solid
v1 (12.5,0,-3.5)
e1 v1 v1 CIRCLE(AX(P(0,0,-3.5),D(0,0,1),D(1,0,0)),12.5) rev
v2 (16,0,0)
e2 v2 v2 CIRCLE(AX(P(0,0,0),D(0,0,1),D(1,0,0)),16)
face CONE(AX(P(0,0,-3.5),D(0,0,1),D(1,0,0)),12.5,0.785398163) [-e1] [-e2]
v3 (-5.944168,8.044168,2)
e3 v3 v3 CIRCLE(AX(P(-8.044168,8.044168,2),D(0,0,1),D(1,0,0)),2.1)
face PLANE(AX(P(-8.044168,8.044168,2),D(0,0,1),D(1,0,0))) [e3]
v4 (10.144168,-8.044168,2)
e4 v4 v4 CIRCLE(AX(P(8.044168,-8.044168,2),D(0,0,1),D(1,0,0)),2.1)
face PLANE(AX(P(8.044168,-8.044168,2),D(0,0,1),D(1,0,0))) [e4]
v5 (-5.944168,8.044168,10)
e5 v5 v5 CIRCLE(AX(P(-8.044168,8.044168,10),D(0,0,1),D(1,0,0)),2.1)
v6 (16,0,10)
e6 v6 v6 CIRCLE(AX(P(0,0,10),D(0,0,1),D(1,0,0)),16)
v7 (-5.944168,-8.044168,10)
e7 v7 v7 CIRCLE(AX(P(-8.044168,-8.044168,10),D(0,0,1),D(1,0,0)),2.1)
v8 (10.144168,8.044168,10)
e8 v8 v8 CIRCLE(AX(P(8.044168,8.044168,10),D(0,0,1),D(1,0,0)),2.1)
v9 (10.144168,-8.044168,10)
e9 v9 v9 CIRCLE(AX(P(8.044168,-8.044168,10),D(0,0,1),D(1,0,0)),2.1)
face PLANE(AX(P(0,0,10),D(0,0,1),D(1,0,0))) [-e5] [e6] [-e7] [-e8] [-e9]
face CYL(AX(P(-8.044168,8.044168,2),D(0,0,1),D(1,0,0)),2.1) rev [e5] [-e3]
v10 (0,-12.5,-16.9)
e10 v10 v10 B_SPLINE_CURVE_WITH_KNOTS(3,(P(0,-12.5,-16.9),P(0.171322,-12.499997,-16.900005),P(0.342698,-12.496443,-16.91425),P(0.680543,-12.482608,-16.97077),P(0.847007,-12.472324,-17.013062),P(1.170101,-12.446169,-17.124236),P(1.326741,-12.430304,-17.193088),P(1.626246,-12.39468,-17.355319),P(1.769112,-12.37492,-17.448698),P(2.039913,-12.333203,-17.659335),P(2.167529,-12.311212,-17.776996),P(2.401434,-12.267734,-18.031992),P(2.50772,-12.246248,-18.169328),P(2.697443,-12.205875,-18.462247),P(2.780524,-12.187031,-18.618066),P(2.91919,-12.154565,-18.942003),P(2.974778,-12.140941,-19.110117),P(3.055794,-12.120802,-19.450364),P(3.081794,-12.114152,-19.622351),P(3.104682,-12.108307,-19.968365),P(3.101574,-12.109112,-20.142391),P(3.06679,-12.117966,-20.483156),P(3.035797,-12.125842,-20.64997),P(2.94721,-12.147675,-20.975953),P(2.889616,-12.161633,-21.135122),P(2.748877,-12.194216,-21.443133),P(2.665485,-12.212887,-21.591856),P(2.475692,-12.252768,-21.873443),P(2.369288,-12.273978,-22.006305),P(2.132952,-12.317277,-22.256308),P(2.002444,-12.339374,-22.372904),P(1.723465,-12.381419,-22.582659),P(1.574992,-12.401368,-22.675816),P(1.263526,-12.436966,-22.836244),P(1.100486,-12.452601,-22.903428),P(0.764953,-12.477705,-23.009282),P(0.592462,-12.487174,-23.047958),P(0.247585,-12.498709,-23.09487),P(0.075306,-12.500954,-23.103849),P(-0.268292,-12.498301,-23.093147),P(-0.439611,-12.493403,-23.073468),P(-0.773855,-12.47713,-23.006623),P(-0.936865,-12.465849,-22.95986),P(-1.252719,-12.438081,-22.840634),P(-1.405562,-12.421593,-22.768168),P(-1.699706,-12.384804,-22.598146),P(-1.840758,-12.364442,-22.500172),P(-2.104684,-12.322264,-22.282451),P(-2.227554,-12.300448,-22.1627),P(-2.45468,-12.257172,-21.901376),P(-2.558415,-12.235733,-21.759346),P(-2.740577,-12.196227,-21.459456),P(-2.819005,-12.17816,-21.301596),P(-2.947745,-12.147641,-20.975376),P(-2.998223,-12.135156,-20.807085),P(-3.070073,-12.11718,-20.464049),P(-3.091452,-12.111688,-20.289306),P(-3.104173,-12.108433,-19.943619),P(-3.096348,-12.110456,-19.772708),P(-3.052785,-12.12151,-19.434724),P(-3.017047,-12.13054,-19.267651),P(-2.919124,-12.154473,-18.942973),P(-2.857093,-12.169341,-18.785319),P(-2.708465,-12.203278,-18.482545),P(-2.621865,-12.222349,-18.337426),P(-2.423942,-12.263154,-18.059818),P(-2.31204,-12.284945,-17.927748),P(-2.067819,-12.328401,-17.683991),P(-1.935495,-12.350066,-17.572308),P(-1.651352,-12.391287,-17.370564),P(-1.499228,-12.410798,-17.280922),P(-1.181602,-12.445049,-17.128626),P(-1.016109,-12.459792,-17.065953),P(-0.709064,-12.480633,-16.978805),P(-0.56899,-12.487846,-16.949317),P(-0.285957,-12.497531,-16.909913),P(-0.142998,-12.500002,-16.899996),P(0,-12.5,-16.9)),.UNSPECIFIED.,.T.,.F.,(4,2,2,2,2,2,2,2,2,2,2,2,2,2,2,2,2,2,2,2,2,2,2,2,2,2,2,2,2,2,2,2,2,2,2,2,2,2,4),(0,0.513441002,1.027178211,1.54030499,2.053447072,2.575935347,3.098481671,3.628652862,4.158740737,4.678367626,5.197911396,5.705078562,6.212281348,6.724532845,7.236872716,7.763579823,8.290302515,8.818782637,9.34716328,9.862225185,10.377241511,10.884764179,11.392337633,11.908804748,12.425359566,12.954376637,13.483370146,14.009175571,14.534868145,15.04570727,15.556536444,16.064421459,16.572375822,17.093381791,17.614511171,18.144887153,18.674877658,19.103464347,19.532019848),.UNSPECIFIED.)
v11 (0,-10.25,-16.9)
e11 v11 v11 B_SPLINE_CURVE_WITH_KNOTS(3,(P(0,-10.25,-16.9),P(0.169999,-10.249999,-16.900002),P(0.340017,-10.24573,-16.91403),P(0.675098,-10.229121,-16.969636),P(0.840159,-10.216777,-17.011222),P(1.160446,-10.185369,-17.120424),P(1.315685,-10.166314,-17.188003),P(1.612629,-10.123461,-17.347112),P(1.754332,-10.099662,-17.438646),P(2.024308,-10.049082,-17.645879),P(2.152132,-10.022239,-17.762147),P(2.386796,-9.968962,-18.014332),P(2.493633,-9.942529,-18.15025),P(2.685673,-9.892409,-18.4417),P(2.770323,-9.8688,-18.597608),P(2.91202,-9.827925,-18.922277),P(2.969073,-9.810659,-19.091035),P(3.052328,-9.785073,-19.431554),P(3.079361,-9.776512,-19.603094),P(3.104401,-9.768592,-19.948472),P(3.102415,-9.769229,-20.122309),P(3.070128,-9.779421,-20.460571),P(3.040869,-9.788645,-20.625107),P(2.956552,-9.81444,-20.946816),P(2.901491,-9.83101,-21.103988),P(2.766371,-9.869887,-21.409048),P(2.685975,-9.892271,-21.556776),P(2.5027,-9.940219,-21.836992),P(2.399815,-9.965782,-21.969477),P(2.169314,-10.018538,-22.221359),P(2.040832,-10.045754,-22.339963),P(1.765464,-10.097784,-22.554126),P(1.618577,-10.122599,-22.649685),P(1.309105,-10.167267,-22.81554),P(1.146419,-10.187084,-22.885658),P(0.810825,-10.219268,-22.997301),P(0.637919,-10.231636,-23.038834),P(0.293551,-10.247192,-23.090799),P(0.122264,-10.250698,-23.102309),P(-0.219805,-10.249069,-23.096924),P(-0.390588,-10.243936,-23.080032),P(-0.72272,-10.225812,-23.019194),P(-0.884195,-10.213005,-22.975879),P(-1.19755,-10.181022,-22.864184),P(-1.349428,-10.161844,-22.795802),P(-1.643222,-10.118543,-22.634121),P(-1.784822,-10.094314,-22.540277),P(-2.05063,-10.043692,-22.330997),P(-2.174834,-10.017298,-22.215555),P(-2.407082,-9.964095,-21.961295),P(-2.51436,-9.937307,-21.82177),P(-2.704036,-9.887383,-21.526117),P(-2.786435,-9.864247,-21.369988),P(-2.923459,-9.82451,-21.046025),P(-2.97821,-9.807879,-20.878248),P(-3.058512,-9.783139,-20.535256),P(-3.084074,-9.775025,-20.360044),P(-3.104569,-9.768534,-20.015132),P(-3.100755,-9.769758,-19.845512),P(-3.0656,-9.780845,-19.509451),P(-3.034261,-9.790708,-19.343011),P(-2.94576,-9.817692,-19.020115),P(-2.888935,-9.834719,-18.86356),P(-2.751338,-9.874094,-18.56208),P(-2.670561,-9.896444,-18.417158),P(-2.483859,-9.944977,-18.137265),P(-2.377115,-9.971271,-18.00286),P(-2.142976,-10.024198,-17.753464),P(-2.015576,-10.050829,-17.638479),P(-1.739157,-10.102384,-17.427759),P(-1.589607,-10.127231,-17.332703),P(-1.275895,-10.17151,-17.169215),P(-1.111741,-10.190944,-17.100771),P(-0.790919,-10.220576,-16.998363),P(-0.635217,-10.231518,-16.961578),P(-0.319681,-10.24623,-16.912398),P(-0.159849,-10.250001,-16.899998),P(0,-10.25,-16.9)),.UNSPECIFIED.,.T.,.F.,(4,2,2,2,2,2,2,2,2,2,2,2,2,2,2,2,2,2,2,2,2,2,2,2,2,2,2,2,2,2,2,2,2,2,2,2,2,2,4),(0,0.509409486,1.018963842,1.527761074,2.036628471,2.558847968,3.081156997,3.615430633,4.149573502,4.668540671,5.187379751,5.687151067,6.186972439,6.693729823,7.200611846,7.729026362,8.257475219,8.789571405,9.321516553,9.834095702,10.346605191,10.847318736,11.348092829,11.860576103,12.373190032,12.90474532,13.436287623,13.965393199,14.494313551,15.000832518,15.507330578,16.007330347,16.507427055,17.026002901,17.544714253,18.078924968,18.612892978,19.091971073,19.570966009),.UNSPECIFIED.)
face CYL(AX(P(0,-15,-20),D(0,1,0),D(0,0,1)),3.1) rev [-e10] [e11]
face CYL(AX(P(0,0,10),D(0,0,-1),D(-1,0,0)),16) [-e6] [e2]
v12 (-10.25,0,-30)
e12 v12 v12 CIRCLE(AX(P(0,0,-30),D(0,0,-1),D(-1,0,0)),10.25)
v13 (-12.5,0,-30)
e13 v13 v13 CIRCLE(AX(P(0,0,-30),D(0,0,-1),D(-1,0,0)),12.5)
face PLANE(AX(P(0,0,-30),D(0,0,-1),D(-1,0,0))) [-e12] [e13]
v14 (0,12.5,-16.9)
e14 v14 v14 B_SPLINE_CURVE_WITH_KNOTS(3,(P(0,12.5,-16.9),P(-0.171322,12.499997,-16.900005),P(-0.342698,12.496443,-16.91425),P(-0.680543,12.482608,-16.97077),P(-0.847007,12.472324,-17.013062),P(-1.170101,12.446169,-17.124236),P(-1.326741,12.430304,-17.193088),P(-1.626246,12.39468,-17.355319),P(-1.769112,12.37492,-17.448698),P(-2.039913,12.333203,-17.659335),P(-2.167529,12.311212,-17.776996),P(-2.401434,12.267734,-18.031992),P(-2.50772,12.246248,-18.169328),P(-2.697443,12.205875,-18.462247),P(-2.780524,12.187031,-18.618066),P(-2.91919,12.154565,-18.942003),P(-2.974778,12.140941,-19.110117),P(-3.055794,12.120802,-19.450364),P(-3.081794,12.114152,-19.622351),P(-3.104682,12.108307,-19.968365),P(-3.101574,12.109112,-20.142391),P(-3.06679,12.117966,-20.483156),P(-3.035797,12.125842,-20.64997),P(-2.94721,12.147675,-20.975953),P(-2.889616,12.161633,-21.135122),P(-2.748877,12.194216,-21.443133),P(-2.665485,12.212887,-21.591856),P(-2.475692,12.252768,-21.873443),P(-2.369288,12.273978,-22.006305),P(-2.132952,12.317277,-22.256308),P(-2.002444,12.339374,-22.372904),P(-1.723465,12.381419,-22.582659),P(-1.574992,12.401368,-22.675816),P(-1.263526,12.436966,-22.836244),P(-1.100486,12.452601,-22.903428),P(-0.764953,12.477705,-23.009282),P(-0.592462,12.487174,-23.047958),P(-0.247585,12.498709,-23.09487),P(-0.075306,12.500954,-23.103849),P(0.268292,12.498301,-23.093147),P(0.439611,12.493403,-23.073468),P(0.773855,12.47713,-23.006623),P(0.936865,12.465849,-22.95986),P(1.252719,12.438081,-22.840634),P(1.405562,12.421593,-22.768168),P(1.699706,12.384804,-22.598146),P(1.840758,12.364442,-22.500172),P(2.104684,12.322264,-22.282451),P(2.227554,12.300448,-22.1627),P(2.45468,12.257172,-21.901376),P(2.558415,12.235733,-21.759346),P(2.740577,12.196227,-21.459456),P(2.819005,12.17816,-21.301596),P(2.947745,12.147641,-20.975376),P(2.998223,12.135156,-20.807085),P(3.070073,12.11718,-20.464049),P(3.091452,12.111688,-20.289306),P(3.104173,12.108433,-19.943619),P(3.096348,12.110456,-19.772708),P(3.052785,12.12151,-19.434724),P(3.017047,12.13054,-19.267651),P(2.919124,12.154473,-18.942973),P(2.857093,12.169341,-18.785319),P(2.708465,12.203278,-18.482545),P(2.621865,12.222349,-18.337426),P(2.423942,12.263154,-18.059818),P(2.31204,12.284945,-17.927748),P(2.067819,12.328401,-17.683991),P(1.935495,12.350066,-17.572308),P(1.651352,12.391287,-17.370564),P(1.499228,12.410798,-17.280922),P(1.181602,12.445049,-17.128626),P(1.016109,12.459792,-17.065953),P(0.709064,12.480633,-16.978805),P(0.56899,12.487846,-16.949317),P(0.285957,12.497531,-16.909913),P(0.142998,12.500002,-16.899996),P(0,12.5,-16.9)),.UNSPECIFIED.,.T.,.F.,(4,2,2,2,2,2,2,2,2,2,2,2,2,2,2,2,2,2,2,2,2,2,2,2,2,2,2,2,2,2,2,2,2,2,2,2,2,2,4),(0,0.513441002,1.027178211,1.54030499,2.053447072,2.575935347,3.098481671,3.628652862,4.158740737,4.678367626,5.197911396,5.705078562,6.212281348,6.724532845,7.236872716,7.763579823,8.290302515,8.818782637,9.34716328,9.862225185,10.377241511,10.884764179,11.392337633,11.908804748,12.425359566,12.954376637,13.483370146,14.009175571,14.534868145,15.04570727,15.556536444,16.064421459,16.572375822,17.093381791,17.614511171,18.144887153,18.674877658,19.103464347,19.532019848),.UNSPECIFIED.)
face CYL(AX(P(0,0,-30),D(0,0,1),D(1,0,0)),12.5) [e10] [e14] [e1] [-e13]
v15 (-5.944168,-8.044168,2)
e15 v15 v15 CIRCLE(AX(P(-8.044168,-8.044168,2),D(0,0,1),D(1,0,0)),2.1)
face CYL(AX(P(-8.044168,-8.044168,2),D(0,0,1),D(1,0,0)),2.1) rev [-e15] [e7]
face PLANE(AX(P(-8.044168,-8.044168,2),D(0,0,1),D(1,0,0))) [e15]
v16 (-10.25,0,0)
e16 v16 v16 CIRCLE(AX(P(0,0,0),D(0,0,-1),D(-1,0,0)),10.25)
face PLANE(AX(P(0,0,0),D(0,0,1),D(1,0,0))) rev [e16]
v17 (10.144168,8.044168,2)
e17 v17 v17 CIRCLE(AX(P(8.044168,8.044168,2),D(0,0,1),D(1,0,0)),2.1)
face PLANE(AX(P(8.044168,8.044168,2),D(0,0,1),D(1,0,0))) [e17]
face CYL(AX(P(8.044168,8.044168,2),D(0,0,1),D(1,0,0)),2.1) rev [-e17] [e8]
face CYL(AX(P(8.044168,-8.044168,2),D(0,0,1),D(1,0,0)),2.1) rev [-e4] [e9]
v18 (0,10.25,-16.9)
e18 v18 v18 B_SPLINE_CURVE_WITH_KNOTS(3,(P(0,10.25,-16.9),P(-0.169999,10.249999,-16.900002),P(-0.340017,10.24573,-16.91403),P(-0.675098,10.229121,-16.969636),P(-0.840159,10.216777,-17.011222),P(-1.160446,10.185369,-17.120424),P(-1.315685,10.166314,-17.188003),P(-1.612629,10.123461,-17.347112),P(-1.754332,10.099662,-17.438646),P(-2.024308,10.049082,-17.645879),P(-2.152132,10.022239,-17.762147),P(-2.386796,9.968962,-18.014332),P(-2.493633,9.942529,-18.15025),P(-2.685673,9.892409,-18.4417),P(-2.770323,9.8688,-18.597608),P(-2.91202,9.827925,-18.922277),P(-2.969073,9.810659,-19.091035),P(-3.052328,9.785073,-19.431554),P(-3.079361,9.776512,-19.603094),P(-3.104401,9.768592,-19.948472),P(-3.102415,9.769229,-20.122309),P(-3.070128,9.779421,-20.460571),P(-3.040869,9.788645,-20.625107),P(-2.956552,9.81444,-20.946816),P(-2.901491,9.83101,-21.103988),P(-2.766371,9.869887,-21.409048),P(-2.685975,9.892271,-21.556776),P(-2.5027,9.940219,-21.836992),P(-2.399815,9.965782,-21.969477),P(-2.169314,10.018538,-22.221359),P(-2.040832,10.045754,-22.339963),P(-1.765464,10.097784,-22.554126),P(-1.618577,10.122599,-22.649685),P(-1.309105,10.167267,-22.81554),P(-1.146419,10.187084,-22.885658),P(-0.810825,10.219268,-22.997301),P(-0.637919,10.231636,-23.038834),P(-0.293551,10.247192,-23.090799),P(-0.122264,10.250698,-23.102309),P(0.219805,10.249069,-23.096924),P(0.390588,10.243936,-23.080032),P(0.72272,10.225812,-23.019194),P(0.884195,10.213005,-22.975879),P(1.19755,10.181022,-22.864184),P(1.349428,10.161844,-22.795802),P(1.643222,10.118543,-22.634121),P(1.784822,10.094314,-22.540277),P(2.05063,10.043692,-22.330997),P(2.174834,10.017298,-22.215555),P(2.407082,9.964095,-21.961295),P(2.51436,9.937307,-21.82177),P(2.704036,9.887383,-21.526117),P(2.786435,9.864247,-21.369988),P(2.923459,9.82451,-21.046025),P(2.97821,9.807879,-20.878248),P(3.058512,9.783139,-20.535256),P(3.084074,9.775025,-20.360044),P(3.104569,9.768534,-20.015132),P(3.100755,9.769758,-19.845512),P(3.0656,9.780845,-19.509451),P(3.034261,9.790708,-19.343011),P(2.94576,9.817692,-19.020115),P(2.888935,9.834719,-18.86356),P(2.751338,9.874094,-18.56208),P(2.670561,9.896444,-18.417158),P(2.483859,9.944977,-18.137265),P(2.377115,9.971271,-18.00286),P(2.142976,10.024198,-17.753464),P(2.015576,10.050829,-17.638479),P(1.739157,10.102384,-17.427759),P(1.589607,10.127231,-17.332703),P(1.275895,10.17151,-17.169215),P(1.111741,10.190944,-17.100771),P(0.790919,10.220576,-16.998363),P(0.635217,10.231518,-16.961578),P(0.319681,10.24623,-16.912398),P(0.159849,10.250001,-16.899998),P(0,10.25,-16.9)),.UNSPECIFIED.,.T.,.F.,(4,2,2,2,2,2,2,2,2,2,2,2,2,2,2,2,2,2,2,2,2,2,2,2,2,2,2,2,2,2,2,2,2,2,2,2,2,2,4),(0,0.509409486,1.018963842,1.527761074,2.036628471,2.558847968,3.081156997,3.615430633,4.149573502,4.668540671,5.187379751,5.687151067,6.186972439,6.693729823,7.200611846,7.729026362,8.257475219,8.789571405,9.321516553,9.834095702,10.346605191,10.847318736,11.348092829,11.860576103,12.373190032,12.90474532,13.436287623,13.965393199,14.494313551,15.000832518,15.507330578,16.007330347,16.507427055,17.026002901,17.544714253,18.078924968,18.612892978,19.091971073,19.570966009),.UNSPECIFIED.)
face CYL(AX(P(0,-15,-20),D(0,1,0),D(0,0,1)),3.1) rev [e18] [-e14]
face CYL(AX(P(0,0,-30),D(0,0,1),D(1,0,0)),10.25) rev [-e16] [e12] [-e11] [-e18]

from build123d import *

# Parameters (mm, degrees)
SKETCH_1_R          = 16
EXTRUDE_1_DEPTH     = 10
SKETCH_2_R          = 12.5
SKETCH_2_R_2        = 10.25
EXTRUDE_2_DEPTH     = 30
SKETCH_3_R          = 2.1
CUT_EXTRUDE_1_DEPTH = 8
SKETCH_5_R          = 3.1
CUT_EXTRUDE_2_DEPTH = 15
CHAMFER_1_SIZE      = 3.5


with BuildPart() as part:
    # 草图1 → 凸台-拉伸1 (new body)
    with BuildSketch(Plane.XY):
        Circle(SKETCH_1_R)
    extrude(amount=EXTRUDE_1_DEPTH)

    # 草图2 → 凸台-拉伸2 (add)
    with BuildSketch(Plane(origin=(0, 0, 0), x_dir=(-1, 0, 0), z_dir=(0, 0, -1))):
        with Locations(Location((0, 0, 0), (0, 0, 180))):
            Circle(SKETCH_2_R)
        Circle(SKETCH_2_R_2, mode=Mode.SUBTRACT)
    extrude(amount=EXTRUDE_2_DEPTH)

    # 草图3 → 切除-拉伸1 (cut)
    with BuildSketch(Plane.XY.offset(10)):
        with Locations((-8.044168072, 8.044168072)):
            Circle(SKETCH_3_R)
        with Locations((8.044168072, 8.044168072)):
            Circle(SKETCH_3_R)
        with Locations((8.044168072, -8.044168072)):
            Circle(SKETCH_3_R)
        with Locations((-8.044168072, -8.044168072)):
            Circle(SKETCH_3_R)
    extrude(amount=-CUT_EXTRUDE_1_DEPTH, mode=Mode.SUBTRACT)

    # 草图5 → 切除-拉伸2 (cut, symmetric)
    with BuildSketch(Plane(origin=(0, 0, 0), x_dir=(1, 0, 0), z_dir=(0, 1, 0))):
        with Locations(Location((0, 20, 0), (0, 0, 270))):
            Circle(SKETCH_5_R)
    extrude(amount=CUT_EXTRUDE_2_DEPTH, both=True, mode=Mode.SUBTRACT)

    # 倒角1
    chamfer_1_edges = [part.edges().sort_by_distance(p)[0] for p in [
        (-12.5, 0, 0),
    ]]
    chamfer(chamfer_1_edges, length=CHAMFER_1_SIZE - 0.0001)  # a hair under: the kernel refuses the full size


solid = part.part
